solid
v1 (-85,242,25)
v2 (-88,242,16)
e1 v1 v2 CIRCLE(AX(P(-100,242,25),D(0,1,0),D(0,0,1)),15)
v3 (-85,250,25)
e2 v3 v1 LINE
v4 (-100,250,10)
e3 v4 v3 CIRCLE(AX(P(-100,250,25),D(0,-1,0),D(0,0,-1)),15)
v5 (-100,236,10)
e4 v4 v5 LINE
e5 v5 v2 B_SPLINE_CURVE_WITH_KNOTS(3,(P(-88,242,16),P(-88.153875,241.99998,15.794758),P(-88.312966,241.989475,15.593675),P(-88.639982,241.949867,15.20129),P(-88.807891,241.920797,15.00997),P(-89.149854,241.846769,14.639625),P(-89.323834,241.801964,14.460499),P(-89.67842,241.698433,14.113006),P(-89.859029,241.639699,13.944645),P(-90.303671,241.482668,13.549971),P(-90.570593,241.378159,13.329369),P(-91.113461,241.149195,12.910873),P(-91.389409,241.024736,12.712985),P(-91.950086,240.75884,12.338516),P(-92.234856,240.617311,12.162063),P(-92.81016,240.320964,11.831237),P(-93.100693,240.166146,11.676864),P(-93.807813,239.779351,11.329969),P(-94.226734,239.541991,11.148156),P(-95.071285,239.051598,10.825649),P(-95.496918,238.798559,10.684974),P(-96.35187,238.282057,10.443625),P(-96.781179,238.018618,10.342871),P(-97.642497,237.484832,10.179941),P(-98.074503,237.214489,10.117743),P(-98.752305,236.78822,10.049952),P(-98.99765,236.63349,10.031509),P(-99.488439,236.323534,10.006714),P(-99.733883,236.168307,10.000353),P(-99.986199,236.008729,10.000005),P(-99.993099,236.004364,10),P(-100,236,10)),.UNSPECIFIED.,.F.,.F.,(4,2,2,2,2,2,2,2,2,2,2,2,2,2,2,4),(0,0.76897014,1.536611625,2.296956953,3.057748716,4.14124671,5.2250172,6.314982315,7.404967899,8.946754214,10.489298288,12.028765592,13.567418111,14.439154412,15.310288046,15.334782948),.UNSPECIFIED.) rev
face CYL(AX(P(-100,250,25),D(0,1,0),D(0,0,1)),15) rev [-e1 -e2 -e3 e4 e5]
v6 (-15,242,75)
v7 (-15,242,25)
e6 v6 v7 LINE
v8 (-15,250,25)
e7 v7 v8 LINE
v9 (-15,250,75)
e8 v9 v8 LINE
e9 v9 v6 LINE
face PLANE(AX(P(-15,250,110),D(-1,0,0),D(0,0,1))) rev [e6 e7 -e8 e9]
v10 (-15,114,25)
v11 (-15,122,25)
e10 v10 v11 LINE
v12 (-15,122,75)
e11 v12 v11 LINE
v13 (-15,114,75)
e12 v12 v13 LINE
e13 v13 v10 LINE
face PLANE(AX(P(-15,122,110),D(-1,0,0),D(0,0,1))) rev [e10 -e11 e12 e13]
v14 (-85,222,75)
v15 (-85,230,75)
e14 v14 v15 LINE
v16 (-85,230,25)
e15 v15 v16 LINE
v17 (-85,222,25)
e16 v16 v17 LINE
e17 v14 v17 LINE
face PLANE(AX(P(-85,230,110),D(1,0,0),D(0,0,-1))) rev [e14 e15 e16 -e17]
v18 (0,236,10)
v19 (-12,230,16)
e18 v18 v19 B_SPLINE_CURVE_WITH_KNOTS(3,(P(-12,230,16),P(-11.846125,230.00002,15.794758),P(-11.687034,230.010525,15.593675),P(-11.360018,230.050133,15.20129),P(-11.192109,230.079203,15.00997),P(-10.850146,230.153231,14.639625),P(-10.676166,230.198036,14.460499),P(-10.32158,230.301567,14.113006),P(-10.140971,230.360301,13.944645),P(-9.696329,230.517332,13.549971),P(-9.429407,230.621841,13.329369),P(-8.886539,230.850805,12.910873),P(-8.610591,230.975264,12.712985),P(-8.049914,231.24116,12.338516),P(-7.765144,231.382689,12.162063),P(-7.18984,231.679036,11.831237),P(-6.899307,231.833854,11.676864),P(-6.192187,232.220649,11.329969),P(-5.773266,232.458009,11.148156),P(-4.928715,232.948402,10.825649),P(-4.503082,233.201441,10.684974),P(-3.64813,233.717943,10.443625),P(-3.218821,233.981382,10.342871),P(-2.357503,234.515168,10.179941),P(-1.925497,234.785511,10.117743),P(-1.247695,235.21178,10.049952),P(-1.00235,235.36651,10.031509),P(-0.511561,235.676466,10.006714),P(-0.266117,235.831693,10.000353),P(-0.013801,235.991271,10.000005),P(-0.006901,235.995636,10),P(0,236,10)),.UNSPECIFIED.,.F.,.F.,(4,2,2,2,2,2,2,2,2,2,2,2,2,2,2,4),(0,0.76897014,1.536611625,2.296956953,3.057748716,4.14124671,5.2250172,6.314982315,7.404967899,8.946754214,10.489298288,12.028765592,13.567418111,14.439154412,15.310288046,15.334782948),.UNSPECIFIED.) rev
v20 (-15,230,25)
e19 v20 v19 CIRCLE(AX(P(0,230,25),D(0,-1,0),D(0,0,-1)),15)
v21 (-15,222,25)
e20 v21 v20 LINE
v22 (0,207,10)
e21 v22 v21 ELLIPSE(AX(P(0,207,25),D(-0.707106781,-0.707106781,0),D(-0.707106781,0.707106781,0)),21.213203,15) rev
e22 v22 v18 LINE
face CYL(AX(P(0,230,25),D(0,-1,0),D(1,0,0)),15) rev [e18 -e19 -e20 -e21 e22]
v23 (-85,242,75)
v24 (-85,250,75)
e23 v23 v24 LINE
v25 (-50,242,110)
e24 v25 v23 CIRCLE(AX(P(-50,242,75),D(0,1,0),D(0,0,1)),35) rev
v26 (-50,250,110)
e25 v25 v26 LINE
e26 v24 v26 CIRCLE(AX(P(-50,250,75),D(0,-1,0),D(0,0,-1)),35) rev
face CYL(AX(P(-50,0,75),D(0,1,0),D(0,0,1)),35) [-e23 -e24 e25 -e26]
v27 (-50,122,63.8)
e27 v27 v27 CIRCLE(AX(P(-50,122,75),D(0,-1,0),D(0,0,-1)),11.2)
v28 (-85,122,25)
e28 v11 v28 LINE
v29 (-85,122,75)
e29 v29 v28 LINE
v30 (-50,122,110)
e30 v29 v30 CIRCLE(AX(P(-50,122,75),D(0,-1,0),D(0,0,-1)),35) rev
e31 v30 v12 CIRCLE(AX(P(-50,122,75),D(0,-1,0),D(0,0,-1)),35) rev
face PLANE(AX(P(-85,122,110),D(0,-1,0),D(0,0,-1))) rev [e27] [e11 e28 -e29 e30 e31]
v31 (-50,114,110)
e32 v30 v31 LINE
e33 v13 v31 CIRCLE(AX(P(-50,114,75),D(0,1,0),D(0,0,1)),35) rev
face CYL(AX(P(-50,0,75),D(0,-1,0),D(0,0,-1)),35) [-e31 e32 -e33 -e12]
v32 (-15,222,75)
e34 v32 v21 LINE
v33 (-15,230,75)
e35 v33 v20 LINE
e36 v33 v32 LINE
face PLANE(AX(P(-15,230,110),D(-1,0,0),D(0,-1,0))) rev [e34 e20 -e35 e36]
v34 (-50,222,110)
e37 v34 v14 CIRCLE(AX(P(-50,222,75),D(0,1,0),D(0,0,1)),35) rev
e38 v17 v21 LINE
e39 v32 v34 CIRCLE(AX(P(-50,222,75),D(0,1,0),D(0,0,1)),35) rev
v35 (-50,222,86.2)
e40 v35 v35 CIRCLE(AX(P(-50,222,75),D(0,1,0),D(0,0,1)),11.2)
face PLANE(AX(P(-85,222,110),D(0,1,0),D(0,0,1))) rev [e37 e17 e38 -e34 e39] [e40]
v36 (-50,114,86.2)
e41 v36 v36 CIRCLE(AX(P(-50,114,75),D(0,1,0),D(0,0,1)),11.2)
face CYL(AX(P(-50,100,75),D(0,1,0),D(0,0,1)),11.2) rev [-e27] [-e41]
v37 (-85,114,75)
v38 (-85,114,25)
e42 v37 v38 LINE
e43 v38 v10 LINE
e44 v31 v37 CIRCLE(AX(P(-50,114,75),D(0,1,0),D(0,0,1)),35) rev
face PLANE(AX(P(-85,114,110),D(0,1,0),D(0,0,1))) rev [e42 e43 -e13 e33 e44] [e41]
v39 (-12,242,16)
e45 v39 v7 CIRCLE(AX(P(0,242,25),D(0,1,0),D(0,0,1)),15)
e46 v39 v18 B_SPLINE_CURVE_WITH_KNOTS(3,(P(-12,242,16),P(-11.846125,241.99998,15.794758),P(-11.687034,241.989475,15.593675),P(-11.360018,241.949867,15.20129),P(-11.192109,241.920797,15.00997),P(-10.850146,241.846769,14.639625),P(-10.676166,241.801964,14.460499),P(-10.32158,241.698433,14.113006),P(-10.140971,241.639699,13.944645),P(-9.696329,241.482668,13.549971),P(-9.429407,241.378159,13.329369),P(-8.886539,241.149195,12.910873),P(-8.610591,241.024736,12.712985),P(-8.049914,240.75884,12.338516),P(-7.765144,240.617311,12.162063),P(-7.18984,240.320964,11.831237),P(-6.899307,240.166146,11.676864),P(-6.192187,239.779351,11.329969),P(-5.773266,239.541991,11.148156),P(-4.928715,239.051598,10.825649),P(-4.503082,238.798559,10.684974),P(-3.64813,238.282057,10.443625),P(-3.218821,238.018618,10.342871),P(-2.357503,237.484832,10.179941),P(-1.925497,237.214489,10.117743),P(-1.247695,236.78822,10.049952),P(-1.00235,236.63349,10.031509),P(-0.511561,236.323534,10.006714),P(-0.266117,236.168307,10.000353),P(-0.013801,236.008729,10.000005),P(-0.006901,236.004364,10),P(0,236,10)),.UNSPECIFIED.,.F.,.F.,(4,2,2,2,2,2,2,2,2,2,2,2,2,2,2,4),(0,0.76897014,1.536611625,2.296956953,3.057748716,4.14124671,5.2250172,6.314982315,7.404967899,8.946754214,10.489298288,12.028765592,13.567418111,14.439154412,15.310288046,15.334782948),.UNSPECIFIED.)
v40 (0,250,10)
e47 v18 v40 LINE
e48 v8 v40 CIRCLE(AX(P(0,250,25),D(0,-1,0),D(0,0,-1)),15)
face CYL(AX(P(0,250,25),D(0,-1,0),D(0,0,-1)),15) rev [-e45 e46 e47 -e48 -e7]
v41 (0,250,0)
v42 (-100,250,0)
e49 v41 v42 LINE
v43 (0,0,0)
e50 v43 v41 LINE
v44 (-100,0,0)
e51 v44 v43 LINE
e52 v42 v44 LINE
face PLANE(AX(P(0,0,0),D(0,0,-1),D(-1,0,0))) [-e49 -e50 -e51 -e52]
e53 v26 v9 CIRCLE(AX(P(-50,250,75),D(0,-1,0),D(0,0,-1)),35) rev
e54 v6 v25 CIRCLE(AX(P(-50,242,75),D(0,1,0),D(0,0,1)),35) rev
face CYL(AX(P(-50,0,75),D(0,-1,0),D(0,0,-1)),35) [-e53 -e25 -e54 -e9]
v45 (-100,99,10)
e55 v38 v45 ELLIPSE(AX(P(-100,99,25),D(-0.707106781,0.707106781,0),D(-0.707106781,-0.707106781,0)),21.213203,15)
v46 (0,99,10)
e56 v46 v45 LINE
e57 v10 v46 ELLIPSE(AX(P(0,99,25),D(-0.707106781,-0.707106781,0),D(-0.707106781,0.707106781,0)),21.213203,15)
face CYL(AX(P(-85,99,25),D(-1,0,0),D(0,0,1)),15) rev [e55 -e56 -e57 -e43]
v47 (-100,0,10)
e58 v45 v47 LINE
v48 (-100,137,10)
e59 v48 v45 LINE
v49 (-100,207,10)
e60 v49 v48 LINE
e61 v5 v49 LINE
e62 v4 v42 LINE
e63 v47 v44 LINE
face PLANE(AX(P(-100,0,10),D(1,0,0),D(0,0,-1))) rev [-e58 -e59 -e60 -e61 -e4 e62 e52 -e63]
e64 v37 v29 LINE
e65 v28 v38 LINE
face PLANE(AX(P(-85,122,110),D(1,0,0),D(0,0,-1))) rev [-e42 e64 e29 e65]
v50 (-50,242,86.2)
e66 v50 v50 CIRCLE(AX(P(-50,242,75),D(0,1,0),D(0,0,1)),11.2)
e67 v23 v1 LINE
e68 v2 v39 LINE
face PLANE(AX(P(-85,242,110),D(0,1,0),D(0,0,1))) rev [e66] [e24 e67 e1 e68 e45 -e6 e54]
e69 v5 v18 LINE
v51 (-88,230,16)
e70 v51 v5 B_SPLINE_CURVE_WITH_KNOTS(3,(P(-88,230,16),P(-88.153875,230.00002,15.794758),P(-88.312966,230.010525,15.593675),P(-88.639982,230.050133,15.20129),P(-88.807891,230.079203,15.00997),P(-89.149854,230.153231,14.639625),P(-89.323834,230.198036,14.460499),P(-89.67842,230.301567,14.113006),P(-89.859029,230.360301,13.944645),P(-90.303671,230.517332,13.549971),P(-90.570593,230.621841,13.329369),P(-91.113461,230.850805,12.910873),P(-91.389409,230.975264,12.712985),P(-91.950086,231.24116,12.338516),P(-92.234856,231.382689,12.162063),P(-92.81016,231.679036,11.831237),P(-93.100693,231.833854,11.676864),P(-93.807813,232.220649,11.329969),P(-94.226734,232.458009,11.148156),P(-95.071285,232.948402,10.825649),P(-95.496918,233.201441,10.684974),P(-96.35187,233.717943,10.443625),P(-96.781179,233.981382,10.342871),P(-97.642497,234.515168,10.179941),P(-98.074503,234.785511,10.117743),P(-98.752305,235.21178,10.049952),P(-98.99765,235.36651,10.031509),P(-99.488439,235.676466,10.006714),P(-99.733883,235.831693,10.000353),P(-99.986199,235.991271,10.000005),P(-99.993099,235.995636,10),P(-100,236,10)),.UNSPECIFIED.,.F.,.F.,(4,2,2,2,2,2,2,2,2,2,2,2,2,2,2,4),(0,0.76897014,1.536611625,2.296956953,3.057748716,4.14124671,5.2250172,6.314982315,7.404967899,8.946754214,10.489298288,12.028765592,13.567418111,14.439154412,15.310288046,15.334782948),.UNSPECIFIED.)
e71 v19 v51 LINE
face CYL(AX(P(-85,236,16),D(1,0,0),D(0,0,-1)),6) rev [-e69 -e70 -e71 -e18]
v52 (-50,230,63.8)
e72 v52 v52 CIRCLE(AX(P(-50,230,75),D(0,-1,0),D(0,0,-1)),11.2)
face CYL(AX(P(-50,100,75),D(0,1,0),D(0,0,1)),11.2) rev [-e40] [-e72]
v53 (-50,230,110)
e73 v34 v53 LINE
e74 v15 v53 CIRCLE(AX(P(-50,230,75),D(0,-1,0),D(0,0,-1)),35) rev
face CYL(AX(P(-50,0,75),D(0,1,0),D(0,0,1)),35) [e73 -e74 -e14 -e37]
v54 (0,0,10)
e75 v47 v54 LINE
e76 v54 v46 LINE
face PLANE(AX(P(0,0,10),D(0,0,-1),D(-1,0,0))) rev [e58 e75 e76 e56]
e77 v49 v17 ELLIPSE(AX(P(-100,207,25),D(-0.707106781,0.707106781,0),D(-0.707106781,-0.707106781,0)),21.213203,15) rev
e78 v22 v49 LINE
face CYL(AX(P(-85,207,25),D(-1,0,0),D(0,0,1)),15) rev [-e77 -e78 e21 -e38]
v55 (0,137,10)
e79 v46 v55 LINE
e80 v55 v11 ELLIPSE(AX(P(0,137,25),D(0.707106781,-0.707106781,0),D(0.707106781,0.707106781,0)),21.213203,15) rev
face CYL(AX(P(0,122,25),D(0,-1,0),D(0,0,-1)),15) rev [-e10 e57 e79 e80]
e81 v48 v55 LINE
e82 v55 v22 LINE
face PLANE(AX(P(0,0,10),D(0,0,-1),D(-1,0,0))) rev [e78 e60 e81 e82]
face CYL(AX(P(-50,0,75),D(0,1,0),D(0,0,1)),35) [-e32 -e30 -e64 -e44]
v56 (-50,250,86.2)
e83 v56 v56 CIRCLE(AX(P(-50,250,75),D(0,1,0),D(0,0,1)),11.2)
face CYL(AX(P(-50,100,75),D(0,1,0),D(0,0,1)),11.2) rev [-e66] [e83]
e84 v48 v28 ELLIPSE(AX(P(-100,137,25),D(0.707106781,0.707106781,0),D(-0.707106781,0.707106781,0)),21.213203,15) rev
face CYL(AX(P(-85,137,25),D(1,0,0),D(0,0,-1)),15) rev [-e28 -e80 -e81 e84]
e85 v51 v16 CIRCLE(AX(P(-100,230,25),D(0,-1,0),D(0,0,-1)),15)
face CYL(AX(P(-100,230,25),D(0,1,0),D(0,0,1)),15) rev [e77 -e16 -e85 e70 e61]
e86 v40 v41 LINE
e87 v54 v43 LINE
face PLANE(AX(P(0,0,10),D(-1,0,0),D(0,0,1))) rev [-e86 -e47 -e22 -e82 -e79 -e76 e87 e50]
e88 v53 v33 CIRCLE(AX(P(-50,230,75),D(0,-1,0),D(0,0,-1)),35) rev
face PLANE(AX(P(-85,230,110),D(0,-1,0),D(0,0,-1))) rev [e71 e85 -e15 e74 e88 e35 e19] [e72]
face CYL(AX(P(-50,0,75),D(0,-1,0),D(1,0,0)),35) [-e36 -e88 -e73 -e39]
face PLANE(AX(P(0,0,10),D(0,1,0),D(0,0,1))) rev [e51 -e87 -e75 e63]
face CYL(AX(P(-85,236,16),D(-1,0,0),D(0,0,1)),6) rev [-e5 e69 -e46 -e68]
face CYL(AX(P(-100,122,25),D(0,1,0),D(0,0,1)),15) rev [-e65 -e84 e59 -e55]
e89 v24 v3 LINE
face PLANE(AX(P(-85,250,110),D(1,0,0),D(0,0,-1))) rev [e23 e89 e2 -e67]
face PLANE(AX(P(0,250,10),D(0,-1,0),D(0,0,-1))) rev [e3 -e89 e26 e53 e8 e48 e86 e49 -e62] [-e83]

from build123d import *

# Parameters (mm, degrees)
ESQUISSE1_W             = 250
ESQUISSE1_H             = 100
BOSS_EXTRU_1_DEPTH      = 10
ESQUISSE2_W             = 70
ESQUISSE2_H             = 8
BOSS_EXTRU_2_DEPTH      = 100
CONG_1_R                = 35
ESQUISSE3_R             = 11.2
ENL_V_MAT_EXTRU_1_DEPTH = 150
CONG_2_R                = 15
CONG_3_R                = 6


with BuildPart() as part:
    # Esquisse1 → Boss.-Extru.1 (new body)
    with BuildSketch(Plane(origin=(0, 0, 0), x_dir=(0, 1, 0), z_dir=(0, 0, 1))):
        with Locations((125, 50)):
            Rectangle(ESQUISSE1_W, ESQUISSE1_H)
    extrude(amount=BOSS_EXTRU_1_DEPTH)

    # Esquisse2 → Boss.-Extru.2 (add)
    with BuildSketch(Plane.XY.offset(10)):
        with Locations((-50, 226)):
            Rectangle(ESQUISSE2_W, ESQUISSE2_H)
        with Locations((-50, 246)):
            Rectangle(ESQUISSE2_W, ESQUISSE2_H)
        with Locations((-50, 118)):
            Rectangle(ESQUISSE2_W, ESQUISSE2_H)
    extrude(amount=BOSS_EXTRU_2_DEPTH)

    # Congé1
    cong_1_edges = [part.edges().sort_by_distance(p)[0] for p in [
        (-85, 226, 110),
        (-15, 226, 110),
        (-15, 118, 110),
        (-85, 118, 110),
        (-85, 246, 110),
        (-15, 246, 110),
    ]]
    fillet(cong_1_edges, radius=CONG_1_R - 0.0001)  # a hair under: the kernel refuses the full size

    # Esquisse3 → Enlèv. mat.-Extru.1 (cut)
    with BuildSketch(Plane(origin=(0, 250, 0), x_dir=(-1, 0, 0), z_dir=(0, 1, 0))):
        with Locations(Location((50, 75, 0), (0, 0, 90))):
            Circle(ESQUISSE3_R)
    extrude(amount=-ENL_V_MAT_EXTRU_1_DEPTH, mode=Mode.SUBTRACT)

    # Congé2
    cong_2_edges = [part.edges().sort_by_distance(p)[0] for p in [
        (-15, 118, 10),
        (-50, 122, 10),
        (-85, 118, 10),
        (-50, 114, 10),
        (-85, 246, 10),
        (-15, 246, 10),
        (-15, 226, 10),
        (-50, 222, 10),
        (-85, 226, 10),
    ]]
    fillet(cong_2_edges, radius=CONG_2_R - 0.0001)  # a hair under: the kernel refuses the full size

    # Congé3
    cong_3_edges = [part.edges().sort_by_distance(p)[0] for p in [
        (-50, 242, 10),
        (-50, 230, 10),
    ]]
    fillet(cong_3_edges, radius=CONG_3_R - 0.0001)  # a hair under: the kernel refuses the full size


solid = part.part
